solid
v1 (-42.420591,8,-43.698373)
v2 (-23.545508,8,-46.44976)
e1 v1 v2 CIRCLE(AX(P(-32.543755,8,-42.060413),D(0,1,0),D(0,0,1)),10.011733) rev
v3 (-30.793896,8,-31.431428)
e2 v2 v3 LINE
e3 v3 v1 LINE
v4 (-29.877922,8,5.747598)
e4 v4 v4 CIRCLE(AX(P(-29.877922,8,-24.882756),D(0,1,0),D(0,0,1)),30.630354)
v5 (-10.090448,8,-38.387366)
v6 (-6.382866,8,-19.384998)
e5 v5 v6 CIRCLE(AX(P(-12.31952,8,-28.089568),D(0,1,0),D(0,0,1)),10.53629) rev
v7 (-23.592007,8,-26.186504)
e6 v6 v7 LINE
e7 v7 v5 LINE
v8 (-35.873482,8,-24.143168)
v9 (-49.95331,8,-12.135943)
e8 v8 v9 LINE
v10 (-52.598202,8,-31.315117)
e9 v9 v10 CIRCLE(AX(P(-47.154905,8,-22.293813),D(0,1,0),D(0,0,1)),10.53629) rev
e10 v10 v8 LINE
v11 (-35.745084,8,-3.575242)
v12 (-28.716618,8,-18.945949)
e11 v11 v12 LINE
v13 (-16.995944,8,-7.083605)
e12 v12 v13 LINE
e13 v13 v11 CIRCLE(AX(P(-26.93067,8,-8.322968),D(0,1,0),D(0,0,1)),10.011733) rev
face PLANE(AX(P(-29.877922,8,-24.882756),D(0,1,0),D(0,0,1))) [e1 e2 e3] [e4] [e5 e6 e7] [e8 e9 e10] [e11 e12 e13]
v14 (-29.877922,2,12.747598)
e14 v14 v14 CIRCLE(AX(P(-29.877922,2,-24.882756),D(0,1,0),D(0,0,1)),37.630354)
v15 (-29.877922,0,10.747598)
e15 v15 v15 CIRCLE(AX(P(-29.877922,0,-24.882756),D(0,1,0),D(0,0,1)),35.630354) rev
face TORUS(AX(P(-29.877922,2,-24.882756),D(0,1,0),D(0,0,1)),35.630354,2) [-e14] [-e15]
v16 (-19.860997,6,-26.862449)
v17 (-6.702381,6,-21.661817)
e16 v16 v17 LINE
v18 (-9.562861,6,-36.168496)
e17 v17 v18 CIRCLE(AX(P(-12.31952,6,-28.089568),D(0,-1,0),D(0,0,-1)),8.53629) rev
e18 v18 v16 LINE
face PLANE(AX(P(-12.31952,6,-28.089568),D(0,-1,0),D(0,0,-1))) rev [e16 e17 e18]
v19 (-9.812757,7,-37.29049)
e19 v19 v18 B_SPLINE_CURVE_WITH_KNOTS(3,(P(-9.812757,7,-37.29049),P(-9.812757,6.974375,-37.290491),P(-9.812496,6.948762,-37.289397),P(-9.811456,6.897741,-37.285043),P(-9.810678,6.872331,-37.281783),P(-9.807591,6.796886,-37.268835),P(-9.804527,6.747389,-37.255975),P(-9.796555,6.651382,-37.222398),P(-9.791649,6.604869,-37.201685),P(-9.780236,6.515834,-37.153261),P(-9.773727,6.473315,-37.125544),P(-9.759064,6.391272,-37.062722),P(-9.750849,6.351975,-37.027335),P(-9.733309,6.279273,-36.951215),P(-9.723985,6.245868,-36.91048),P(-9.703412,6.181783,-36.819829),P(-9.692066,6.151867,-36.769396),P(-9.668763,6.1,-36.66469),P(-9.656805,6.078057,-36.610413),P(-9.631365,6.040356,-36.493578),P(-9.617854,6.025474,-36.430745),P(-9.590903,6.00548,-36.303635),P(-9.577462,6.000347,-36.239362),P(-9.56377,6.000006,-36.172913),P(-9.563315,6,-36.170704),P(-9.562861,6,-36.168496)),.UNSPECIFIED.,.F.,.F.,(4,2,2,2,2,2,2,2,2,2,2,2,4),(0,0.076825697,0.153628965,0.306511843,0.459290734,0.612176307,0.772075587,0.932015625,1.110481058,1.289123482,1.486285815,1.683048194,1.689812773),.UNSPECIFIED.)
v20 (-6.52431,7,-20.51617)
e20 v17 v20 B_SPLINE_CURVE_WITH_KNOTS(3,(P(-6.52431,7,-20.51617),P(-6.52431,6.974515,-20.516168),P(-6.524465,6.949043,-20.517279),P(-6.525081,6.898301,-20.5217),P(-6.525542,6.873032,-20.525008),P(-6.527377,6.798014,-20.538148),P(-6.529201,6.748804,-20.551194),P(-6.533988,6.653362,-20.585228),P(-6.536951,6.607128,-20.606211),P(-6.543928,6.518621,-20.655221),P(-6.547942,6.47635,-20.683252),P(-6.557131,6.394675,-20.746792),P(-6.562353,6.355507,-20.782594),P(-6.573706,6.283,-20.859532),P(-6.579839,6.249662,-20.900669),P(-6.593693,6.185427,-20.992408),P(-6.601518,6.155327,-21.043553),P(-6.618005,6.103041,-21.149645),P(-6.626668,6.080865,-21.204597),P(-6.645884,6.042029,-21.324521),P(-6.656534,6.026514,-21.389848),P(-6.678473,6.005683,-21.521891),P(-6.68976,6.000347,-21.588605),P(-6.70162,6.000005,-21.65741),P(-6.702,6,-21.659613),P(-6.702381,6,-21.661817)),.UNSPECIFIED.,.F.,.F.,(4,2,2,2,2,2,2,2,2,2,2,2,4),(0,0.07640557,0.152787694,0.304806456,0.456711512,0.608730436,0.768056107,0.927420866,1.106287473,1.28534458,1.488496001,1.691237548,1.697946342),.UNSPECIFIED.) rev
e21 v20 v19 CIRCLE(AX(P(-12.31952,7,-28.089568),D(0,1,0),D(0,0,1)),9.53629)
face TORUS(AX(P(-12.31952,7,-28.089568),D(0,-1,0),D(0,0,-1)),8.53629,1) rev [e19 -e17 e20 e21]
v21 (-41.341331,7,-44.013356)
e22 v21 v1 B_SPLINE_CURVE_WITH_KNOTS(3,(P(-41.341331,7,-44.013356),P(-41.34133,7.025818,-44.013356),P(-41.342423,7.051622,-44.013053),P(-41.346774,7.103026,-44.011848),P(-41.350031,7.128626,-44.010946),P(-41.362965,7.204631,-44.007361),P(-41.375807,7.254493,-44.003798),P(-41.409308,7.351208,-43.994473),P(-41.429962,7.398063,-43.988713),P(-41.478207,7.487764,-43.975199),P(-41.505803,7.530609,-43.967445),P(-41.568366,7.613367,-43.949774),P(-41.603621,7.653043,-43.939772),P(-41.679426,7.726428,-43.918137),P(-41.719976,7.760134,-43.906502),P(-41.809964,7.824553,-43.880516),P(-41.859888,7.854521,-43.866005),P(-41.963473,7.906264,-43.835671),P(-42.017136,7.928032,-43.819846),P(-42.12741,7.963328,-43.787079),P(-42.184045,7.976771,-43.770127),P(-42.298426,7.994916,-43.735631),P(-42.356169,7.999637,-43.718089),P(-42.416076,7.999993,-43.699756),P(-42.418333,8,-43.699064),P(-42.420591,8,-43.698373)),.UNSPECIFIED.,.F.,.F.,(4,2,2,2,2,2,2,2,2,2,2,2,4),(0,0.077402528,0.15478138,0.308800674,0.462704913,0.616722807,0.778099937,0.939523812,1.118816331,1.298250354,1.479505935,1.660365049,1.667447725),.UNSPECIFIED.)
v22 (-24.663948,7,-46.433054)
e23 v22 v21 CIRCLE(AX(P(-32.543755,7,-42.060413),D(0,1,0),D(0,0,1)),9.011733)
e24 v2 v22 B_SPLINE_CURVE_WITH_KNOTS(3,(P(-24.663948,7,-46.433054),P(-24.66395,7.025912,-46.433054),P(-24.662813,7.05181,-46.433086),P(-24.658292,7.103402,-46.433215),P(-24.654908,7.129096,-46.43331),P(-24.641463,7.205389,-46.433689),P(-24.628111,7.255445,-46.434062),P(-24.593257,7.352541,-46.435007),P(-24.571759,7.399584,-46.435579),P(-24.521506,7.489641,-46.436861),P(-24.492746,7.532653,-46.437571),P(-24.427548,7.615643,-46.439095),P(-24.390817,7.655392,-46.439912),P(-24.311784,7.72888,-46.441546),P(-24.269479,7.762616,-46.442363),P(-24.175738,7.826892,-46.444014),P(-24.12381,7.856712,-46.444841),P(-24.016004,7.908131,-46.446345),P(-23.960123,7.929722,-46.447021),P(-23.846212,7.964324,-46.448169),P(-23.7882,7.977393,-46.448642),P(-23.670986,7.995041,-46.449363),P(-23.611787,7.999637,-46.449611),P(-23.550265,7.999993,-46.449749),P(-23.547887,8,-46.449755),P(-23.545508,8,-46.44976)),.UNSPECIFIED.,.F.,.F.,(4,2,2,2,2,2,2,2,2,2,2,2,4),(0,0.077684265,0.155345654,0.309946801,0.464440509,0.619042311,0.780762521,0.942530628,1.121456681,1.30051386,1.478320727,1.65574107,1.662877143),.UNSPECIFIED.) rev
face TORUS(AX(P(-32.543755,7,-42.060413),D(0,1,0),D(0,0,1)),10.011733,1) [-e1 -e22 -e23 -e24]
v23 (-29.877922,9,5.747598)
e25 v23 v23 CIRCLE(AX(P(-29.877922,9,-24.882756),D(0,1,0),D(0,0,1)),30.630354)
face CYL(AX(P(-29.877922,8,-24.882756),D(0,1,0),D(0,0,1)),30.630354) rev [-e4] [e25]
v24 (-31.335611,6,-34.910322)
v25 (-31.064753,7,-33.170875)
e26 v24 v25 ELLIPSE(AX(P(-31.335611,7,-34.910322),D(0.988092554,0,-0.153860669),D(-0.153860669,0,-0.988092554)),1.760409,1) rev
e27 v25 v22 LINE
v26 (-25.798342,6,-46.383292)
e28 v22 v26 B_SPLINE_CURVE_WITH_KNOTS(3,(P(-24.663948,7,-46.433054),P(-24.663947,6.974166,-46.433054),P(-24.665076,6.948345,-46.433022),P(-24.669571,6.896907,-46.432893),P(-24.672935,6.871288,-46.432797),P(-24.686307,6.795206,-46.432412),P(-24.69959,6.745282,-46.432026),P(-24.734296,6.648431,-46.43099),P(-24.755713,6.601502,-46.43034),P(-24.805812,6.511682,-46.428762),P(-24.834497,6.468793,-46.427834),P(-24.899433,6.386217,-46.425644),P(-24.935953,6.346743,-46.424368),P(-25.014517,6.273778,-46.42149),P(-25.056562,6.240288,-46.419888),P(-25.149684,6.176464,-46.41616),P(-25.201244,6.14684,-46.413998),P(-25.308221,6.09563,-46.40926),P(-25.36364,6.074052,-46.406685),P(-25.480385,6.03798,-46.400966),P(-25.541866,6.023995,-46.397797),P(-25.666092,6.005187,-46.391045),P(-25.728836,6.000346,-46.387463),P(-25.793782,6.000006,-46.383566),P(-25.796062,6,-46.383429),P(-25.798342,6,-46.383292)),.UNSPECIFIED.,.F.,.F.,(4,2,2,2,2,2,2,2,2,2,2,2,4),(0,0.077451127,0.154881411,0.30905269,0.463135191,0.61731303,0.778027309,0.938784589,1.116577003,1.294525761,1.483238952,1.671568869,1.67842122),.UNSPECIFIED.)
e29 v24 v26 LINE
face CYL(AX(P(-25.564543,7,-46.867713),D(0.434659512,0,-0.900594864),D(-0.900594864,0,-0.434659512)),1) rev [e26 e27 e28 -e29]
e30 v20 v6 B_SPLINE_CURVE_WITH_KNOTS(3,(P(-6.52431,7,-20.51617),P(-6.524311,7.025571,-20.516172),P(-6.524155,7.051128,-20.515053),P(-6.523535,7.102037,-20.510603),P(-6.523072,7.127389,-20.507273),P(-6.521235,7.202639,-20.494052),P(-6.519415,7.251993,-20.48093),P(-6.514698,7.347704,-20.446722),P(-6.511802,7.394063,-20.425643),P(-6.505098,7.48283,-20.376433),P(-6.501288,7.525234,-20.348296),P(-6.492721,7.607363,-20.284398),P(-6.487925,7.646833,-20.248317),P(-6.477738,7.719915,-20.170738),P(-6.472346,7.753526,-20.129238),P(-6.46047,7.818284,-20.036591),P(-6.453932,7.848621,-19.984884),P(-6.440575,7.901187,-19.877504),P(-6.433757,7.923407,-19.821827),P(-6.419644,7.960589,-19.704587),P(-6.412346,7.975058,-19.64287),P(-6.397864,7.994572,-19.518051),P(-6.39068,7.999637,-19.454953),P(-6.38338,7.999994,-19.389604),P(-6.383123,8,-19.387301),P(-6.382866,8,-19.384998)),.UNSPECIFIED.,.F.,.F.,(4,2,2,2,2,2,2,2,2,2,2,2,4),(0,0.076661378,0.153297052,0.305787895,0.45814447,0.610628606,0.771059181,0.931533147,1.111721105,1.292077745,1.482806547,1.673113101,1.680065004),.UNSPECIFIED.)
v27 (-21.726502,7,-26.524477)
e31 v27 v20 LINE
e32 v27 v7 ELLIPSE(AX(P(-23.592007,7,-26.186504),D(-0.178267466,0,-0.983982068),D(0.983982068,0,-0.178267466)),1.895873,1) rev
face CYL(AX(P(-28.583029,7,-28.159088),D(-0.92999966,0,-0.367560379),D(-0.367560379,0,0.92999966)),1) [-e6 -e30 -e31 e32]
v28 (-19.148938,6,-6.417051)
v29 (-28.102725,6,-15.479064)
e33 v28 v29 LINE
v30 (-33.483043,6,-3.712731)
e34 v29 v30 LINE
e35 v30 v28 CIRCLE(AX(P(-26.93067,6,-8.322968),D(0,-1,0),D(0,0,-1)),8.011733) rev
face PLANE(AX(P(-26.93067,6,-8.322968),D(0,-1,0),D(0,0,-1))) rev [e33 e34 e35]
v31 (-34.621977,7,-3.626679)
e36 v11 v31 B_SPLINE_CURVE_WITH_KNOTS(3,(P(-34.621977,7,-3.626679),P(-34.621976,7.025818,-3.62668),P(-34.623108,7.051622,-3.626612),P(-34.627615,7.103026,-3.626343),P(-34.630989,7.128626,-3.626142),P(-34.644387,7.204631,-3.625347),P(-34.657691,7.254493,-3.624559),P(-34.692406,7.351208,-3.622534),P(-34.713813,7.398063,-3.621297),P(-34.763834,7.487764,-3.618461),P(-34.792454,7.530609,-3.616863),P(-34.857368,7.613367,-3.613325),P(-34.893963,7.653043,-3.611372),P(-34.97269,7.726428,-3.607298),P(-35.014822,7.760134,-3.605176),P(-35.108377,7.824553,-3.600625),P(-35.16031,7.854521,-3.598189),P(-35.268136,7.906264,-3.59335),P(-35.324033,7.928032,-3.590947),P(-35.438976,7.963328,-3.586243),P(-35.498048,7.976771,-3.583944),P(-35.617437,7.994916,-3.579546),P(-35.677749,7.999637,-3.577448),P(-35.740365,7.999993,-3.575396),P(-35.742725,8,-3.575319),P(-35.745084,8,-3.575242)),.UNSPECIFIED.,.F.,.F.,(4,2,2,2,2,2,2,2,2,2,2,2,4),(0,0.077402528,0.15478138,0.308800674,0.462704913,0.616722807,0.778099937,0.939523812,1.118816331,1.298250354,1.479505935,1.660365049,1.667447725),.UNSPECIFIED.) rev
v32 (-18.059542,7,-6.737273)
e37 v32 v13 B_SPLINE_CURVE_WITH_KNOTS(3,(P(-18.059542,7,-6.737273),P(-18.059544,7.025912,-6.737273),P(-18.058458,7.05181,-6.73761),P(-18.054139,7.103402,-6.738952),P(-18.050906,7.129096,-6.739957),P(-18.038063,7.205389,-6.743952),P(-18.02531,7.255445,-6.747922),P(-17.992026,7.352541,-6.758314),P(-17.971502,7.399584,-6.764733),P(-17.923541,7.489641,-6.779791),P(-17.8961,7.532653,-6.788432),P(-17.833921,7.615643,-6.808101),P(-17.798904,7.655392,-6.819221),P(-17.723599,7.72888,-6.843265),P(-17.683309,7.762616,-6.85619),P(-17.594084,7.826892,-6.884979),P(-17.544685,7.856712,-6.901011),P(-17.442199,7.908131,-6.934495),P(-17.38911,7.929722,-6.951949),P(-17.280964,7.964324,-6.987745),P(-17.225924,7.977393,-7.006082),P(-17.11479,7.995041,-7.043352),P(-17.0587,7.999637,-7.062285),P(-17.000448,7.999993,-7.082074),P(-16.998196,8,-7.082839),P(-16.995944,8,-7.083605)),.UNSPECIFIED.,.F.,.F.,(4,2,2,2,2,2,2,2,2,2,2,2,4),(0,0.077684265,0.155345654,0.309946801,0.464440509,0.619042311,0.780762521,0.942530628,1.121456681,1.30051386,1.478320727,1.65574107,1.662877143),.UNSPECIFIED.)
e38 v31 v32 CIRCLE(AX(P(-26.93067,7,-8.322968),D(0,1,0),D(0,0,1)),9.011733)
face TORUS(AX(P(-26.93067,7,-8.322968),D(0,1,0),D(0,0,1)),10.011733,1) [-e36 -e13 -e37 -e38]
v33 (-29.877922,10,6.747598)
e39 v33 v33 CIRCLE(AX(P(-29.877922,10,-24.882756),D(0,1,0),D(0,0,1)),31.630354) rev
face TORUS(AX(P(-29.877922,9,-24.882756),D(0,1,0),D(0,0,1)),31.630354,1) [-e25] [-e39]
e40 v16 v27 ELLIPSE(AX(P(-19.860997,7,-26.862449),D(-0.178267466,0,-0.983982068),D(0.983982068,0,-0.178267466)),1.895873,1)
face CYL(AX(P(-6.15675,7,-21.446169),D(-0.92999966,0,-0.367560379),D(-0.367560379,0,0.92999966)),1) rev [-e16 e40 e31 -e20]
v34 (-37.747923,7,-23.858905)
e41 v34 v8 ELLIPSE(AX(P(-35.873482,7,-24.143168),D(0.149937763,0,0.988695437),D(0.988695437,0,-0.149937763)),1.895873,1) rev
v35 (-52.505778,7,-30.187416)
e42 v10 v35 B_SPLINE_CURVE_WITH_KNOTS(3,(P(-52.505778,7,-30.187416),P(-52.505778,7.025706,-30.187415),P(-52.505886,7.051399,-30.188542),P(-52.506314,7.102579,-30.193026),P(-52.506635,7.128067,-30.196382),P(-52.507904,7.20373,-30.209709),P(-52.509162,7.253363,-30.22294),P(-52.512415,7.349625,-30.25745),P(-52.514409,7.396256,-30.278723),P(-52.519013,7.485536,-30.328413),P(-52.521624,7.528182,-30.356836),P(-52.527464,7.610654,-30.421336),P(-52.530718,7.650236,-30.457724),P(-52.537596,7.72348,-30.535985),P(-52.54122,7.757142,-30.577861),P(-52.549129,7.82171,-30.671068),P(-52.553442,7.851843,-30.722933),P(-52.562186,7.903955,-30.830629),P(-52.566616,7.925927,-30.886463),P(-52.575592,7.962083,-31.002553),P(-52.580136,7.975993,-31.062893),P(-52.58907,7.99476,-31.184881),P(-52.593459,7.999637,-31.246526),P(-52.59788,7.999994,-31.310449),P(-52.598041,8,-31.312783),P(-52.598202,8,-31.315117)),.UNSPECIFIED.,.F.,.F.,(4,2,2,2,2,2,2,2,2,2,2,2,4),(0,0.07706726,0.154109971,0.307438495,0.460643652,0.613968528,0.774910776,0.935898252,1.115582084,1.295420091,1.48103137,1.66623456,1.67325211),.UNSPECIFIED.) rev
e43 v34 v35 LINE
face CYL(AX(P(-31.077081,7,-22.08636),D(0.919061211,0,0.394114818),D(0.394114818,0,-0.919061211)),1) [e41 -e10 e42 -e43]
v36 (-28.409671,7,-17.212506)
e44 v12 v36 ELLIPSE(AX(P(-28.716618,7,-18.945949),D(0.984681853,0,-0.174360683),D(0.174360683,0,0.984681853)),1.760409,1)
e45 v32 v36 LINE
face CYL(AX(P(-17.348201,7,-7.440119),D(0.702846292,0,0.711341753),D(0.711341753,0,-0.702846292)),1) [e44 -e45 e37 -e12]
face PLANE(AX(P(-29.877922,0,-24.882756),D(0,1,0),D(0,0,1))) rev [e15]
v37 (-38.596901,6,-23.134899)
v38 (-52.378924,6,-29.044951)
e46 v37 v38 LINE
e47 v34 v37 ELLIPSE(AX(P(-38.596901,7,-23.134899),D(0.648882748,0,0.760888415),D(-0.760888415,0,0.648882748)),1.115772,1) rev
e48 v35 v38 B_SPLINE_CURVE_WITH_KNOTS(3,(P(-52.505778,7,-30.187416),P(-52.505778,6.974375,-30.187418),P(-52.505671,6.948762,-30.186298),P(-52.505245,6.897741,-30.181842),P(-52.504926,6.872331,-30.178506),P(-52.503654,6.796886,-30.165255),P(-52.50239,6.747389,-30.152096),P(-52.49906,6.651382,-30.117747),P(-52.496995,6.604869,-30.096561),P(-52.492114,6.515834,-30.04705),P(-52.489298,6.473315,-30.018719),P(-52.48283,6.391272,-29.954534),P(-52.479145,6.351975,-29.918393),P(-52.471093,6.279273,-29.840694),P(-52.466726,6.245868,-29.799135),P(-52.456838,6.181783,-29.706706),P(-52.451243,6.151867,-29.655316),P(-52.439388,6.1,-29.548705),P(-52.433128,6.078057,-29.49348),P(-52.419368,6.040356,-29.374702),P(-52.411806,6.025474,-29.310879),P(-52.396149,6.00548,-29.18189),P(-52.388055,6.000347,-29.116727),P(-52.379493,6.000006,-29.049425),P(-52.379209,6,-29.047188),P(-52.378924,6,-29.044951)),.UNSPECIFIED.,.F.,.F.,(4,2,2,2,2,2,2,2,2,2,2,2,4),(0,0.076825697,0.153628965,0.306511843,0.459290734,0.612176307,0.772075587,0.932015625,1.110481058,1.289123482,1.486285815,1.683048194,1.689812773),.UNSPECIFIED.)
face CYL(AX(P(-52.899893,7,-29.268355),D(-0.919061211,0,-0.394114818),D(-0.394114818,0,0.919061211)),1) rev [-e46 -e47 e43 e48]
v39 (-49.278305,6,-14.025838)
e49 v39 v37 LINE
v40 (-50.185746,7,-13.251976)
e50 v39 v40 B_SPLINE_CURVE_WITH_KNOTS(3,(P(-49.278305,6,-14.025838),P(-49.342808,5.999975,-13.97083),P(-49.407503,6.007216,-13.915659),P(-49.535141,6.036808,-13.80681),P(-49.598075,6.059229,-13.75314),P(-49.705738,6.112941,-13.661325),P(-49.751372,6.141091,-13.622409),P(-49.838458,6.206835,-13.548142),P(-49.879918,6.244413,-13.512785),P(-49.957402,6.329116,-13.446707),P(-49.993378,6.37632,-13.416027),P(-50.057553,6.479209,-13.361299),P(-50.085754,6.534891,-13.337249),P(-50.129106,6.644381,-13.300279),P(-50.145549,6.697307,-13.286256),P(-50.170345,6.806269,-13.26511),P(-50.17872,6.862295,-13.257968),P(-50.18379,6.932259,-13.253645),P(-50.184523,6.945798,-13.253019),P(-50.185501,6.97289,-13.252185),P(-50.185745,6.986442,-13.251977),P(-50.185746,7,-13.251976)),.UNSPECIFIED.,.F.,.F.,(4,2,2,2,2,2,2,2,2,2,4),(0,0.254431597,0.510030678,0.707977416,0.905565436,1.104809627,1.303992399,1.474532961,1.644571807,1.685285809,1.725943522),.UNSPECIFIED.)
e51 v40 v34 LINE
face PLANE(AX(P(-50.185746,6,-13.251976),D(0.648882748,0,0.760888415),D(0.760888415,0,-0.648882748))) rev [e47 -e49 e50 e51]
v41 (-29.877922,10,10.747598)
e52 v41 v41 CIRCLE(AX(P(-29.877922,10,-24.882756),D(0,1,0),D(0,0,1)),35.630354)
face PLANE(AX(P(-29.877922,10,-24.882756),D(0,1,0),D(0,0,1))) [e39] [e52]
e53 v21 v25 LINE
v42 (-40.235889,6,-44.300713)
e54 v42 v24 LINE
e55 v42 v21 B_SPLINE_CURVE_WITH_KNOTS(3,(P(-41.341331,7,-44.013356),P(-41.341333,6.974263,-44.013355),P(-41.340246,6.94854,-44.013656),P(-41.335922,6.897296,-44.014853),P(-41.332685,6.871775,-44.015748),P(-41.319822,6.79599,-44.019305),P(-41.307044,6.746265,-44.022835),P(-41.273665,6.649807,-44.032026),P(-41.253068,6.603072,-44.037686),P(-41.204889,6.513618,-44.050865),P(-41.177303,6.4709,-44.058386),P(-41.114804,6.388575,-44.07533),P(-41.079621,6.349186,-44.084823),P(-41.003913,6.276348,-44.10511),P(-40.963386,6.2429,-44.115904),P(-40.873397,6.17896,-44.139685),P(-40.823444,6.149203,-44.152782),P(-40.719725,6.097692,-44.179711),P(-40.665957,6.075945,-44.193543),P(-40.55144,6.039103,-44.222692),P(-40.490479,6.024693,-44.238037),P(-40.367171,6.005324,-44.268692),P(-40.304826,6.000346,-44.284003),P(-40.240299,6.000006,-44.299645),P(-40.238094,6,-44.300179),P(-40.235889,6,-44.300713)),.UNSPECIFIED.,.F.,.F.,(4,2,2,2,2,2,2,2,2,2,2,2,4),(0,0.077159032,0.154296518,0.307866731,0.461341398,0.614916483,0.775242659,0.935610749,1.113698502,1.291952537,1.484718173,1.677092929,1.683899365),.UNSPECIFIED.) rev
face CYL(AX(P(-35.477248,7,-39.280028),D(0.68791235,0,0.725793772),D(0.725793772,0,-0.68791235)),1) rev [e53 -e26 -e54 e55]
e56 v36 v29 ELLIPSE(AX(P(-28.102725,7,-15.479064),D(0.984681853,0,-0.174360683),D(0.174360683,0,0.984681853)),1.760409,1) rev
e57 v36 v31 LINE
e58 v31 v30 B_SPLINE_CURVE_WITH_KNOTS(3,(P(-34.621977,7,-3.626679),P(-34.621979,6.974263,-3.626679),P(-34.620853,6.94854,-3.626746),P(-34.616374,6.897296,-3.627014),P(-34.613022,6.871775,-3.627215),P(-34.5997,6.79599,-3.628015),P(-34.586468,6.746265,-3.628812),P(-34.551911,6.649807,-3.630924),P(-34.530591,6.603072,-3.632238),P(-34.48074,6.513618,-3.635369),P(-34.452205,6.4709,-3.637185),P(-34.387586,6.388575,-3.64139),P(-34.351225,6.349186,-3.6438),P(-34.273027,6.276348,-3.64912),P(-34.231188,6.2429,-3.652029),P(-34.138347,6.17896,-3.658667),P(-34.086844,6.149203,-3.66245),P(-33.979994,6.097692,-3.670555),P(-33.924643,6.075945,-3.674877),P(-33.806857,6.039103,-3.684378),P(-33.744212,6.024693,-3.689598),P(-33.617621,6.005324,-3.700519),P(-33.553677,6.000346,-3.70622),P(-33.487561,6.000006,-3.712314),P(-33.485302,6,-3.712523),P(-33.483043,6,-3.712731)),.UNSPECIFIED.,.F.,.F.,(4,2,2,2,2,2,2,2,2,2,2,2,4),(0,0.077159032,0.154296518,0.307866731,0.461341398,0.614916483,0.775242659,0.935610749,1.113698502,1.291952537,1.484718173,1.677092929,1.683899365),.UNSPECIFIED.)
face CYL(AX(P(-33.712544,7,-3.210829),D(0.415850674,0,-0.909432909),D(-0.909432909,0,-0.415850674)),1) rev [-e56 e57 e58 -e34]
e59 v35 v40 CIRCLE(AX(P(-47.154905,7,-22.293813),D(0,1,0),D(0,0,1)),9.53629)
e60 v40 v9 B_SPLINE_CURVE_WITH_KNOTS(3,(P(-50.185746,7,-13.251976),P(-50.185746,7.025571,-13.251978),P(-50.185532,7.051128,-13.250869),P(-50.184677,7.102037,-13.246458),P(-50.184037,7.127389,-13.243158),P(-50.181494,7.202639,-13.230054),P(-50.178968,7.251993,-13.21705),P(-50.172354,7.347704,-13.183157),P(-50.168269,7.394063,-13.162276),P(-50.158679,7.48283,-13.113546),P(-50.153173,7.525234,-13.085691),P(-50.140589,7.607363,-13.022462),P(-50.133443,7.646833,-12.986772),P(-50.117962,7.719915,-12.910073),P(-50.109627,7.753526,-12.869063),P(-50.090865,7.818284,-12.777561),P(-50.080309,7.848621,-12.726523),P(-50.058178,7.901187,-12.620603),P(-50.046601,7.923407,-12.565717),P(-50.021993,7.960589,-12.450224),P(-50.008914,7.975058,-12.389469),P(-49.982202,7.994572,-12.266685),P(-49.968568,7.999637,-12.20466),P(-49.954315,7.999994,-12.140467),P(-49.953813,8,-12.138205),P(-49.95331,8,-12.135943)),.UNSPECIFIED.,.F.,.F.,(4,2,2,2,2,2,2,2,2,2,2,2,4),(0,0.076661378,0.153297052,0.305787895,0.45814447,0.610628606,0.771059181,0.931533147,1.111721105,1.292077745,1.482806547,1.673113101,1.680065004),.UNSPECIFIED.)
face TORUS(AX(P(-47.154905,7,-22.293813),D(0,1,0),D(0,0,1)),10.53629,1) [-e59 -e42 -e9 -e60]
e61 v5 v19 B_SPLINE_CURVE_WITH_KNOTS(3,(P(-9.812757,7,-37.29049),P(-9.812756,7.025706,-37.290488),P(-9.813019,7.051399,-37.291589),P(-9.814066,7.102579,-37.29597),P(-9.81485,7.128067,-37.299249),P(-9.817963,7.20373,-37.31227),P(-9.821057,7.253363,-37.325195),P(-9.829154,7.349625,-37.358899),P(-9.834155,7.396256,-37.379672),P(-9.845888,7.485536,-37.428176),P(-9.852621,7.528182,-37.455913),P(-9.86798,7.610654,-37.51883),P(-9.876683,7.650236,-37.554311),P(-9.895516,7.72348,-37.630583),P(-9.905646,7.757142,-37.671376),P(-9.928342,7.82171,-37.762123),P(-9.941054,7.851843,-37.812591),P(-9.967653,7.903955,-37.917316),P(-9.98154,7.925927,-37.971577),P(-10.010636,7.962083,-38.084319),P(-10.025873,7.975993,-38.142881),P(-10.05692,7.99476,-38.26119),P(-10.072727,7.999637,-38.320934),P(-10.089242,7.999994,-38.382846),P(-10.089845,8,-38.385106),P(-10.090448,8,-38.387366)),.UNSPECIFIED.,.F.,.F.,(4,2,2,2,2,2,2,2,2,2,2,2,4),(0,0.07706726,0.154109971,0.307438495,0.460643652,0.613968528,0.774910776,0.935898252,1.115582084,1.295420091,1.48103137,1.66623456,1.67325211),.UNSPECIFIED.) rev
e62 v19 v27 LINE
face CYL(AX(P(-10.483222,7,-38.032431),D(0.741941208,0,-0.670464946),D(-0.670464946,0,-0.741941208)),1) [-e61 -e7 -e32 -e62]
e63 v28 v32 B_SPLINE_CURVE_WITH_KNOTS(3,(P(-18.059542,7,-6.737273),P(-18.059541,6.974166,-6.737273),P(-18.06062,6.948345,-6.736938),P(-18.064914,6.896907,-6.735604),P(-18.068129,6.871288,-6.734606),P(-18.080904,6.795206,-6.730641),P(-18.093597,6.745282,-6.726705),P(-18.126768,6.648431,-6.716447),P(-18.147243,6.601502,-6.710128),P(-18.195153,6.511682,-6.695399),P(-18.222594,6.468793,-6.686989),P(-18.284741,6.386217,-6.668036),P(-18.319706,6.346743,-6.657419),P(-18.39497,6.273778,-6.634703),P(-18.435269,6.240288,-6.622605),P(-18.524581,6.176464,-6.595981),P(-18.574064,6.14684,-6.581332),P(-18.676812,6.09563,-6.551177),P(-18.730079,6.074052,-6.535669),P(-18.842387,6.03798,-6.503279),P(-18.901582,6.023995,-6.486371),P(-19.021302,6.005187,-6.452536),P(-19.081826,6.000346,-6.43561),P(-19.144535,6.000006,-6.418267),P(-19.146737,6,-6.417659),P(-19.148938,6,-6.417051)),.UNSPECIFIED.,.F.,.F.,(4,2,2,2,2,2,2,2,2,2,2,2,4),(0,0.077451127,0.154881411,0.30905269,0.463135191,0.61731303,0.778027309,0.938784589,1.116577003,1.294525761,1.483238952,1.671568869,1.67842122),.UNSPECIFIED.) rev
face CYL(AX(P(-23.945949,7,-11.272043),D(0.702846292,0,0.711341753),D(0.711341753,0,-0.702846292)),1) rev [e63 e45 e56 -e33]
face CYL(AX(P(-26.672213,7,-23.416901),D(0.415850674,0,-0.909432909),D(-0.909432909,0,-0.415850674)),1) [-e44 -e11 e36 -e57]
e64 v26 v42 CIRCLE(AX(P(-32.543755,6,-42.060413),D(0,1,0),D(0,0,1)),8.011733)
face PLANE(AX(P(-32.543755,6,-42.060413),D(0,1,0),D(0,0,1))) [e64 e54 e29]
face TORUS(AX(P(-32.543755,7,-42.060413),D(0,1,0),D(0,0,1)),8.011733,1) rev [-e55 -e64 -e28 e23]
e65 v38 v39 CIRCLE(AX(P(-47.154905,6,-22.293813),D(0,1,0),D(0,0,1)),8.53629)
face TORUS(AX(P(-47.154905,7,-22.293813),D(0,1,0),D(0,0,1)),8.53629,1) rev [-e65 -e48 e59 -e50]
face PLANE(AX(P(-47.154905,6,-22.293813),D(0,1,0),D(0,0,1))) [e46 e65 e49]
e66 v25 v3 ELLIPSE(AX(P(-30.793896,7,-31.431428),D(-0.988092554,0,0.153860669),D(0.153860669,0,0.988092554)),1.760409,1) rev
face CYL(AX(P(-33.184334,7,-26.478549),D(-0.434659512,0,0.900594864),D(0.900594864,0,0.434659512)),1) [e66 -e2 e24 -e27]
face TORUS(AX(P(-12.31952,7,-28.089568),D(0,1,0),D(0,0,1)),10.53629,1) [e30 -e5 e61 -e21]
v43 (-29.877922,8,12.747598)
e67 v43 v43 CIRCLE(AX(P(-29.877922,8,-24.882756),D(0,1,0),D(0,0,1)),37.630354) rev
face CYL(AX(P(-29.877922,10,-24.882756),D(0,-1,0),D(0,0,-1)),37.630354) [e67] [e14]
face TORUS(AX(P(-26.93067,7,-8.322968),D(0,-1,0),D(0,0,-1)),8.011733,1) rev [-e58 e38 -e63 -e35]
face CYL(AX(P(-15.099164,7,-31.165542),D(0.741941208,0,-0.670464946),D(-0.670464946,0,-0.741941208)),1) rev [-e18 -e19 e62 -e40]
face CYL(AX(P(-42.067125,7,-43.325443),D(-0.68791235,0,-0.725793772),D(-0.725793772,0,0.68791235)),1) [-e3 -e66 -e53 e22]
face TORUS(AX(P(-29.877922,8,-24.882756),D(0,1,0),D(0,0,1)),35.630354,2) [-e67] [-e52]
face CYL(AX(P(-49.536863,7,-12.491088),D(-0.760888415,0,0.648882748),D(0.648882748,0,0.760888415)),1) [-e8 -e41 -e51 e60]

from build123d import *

# Parameters (mm, degrees)
SKETCH1_R           = 37.630353996
BOSS_EXTRUDE1_DEPTH = 10
FILLET2_R           = 2
FILLET3_R           = 2
SKETCH2_R           = 30.630353996
CUT_EXTRUDE1_DEPTH  = 2
FILLET4_R           = 1
CUT_EXTRUDE4_DEPTH  = 2
FILLET5_R           = 1


with BuildPart() as part:
    # Sketch1 → Boss-Extrude1 (new body)
    with BuildSketch(Plane(origin=(0, 0, 0), x_dir=(1, 0, 0), z_dir=(0, 1, 0))):
        with Locations(Location((-29.877921898, 24.882755633, 0), (0, 0, 270))):
            Circle(SKETCH1_R)
    extrude(amount=BOSS_EXTRUDE1_DEPTH)

    # Fillet2
    fillet2_edges = [part.edges().sort_by_distance(p)[0] for p in [
        (-29.877921898, 10, -62.513109628),
    ]]
    fillet(fillet2_edges, radius=FILLET2_R)

    # Fillet3
    fillet3_edges = [part.edges().sort_by_distance(p)[0] for p in [
        (-29.877921898, 0, -62.513109628),
    ]]
    fillet(fillet3_edges, radius=FILLET3_R)

    # Sketch2 → Cut-Extrude1 (cut)
    with BuildSketch(Plane(origin=(0, 10, 0), x_dir=(1, 0, 0), z_dir=(0, 1, 0))):
        with Locations(Location((-29.877921898, 24.882755633, 0), (0, 0, 270))):
            Circle(SKETCH2_R)
    extrude(amount=-CUT_EXTRUDE1_DEPTH, mode=Mode.SUBTRACT)

    # Fillet4
    fillet4_edges = [part.edges().sort_by_distance(p)[0] for p in [
        (-29.877921898, 10, -55.513109628),
    ]]
    fillet(fillet4_edges, radius=FILLET4_R)

    # Sketch8 → Cut-Extrude4 (cut)
    with BuildSketch(Plane(origin=(0, 8, 0), x_dir=(1, 0, 0), z_dir=(0, 1, 0))):
        with BuildLine():
            Line((-41.341331235, 44.013355539), (-31.064753216, 33.170874924))
            Line((-31.064753216, 33.170874924), (-24.663948135, 46.43305374))
            ThreePointArc((-24.663948135, 46.43305374), (-33.837706119, 50.978766565), (-41.341331235, 44.013355539))
        make_face()
        with BuildLine():
            Line((-18.059542281, 6.737272878), (-28.409671492, 17.21250643))
            Line((-28.409671492, 17.21250643), (-34.621977315, 3.626679329))
            ThreePointArc((-34.621977315, 3.626679329), (-25.267257218, -0.533915887), (-18.059542281, 6.737272878))
        make_face()
        with BuildLine():
            Line((-50.185746084, 13.251976063), (-37.747922577, 23.858904665))
            Line((-37.747922577, 23.858904665), (-52.505778259, 30.187416349))
            ThreePointArc((-52.505778259, 30.187416349), (-56.60295046, 20.999499638), (-50.185746084, 13.251976063))
        make_face()
        with BuildLine():
            Line((-9.812756735, 37.290489651), (-21.726502131, 26.524476689))
            Line((-21.726502131, 26.524476689), (-6.524310314, 20.51616978))
            ThreePointArc((-6.524310314, 20.51616978), (-2.961361081, 29.924146518), (-9.812756735, 37.290489651))
        make_face()
    extrude(amount=-CUT_EXTRUDE4_DEPTH, mode=Mode.SUBTRACT)

    # Fillet5
    fillet5_edges = [part.edges().sort_by_distance(p)[0] for p in [
        (-45.126850418, 6, -27.023160507),
        (-27.864350675, 6, -39.801964332),
        (-2.961361081, 6, -29.924146518),
        (-23.234606887, 6, -11.974889654),
        (-2.961361081, 8, -29.924146518),
        (-15.769629433, 6, -31.90748317),
        (-15.769629433, 8, -31.90748317),
        (-14.125406223, 6, -23.520323235),
        (-14.125406223, 8, -23.520323235),
        (-23.234606887, 8, -11.974889654),
        (-31.515824404, 6, -10.419592879),
        (-25.267257218, 6, 0.533915887),
        (-25.267257218, 8, 0.533915887),
        (-31.515824404, 8, -10.419592879),
        (-56.60295046, 6, -20.999499638),
        (-33.837706119, 6, -50.978766565),
        (-36.203042226, 6, -38.592115231),
        (-27.864350675, 8, -39.801964332),
        (-33.837706119, 8, -50.978766565),
        (-36.203042226, 8, -38.592115231),
        (-45.126850418, 8, -27.023160507),
        (-43.96683433, 8, -18.555440364),
        (-56.60295046, 8, -20.999499638),
    ]]
    fillet(fillet5_edges, radius=FILLET5_R - 0.0001)  # a hair under: the kernel refuses the full size


solid = part.part
